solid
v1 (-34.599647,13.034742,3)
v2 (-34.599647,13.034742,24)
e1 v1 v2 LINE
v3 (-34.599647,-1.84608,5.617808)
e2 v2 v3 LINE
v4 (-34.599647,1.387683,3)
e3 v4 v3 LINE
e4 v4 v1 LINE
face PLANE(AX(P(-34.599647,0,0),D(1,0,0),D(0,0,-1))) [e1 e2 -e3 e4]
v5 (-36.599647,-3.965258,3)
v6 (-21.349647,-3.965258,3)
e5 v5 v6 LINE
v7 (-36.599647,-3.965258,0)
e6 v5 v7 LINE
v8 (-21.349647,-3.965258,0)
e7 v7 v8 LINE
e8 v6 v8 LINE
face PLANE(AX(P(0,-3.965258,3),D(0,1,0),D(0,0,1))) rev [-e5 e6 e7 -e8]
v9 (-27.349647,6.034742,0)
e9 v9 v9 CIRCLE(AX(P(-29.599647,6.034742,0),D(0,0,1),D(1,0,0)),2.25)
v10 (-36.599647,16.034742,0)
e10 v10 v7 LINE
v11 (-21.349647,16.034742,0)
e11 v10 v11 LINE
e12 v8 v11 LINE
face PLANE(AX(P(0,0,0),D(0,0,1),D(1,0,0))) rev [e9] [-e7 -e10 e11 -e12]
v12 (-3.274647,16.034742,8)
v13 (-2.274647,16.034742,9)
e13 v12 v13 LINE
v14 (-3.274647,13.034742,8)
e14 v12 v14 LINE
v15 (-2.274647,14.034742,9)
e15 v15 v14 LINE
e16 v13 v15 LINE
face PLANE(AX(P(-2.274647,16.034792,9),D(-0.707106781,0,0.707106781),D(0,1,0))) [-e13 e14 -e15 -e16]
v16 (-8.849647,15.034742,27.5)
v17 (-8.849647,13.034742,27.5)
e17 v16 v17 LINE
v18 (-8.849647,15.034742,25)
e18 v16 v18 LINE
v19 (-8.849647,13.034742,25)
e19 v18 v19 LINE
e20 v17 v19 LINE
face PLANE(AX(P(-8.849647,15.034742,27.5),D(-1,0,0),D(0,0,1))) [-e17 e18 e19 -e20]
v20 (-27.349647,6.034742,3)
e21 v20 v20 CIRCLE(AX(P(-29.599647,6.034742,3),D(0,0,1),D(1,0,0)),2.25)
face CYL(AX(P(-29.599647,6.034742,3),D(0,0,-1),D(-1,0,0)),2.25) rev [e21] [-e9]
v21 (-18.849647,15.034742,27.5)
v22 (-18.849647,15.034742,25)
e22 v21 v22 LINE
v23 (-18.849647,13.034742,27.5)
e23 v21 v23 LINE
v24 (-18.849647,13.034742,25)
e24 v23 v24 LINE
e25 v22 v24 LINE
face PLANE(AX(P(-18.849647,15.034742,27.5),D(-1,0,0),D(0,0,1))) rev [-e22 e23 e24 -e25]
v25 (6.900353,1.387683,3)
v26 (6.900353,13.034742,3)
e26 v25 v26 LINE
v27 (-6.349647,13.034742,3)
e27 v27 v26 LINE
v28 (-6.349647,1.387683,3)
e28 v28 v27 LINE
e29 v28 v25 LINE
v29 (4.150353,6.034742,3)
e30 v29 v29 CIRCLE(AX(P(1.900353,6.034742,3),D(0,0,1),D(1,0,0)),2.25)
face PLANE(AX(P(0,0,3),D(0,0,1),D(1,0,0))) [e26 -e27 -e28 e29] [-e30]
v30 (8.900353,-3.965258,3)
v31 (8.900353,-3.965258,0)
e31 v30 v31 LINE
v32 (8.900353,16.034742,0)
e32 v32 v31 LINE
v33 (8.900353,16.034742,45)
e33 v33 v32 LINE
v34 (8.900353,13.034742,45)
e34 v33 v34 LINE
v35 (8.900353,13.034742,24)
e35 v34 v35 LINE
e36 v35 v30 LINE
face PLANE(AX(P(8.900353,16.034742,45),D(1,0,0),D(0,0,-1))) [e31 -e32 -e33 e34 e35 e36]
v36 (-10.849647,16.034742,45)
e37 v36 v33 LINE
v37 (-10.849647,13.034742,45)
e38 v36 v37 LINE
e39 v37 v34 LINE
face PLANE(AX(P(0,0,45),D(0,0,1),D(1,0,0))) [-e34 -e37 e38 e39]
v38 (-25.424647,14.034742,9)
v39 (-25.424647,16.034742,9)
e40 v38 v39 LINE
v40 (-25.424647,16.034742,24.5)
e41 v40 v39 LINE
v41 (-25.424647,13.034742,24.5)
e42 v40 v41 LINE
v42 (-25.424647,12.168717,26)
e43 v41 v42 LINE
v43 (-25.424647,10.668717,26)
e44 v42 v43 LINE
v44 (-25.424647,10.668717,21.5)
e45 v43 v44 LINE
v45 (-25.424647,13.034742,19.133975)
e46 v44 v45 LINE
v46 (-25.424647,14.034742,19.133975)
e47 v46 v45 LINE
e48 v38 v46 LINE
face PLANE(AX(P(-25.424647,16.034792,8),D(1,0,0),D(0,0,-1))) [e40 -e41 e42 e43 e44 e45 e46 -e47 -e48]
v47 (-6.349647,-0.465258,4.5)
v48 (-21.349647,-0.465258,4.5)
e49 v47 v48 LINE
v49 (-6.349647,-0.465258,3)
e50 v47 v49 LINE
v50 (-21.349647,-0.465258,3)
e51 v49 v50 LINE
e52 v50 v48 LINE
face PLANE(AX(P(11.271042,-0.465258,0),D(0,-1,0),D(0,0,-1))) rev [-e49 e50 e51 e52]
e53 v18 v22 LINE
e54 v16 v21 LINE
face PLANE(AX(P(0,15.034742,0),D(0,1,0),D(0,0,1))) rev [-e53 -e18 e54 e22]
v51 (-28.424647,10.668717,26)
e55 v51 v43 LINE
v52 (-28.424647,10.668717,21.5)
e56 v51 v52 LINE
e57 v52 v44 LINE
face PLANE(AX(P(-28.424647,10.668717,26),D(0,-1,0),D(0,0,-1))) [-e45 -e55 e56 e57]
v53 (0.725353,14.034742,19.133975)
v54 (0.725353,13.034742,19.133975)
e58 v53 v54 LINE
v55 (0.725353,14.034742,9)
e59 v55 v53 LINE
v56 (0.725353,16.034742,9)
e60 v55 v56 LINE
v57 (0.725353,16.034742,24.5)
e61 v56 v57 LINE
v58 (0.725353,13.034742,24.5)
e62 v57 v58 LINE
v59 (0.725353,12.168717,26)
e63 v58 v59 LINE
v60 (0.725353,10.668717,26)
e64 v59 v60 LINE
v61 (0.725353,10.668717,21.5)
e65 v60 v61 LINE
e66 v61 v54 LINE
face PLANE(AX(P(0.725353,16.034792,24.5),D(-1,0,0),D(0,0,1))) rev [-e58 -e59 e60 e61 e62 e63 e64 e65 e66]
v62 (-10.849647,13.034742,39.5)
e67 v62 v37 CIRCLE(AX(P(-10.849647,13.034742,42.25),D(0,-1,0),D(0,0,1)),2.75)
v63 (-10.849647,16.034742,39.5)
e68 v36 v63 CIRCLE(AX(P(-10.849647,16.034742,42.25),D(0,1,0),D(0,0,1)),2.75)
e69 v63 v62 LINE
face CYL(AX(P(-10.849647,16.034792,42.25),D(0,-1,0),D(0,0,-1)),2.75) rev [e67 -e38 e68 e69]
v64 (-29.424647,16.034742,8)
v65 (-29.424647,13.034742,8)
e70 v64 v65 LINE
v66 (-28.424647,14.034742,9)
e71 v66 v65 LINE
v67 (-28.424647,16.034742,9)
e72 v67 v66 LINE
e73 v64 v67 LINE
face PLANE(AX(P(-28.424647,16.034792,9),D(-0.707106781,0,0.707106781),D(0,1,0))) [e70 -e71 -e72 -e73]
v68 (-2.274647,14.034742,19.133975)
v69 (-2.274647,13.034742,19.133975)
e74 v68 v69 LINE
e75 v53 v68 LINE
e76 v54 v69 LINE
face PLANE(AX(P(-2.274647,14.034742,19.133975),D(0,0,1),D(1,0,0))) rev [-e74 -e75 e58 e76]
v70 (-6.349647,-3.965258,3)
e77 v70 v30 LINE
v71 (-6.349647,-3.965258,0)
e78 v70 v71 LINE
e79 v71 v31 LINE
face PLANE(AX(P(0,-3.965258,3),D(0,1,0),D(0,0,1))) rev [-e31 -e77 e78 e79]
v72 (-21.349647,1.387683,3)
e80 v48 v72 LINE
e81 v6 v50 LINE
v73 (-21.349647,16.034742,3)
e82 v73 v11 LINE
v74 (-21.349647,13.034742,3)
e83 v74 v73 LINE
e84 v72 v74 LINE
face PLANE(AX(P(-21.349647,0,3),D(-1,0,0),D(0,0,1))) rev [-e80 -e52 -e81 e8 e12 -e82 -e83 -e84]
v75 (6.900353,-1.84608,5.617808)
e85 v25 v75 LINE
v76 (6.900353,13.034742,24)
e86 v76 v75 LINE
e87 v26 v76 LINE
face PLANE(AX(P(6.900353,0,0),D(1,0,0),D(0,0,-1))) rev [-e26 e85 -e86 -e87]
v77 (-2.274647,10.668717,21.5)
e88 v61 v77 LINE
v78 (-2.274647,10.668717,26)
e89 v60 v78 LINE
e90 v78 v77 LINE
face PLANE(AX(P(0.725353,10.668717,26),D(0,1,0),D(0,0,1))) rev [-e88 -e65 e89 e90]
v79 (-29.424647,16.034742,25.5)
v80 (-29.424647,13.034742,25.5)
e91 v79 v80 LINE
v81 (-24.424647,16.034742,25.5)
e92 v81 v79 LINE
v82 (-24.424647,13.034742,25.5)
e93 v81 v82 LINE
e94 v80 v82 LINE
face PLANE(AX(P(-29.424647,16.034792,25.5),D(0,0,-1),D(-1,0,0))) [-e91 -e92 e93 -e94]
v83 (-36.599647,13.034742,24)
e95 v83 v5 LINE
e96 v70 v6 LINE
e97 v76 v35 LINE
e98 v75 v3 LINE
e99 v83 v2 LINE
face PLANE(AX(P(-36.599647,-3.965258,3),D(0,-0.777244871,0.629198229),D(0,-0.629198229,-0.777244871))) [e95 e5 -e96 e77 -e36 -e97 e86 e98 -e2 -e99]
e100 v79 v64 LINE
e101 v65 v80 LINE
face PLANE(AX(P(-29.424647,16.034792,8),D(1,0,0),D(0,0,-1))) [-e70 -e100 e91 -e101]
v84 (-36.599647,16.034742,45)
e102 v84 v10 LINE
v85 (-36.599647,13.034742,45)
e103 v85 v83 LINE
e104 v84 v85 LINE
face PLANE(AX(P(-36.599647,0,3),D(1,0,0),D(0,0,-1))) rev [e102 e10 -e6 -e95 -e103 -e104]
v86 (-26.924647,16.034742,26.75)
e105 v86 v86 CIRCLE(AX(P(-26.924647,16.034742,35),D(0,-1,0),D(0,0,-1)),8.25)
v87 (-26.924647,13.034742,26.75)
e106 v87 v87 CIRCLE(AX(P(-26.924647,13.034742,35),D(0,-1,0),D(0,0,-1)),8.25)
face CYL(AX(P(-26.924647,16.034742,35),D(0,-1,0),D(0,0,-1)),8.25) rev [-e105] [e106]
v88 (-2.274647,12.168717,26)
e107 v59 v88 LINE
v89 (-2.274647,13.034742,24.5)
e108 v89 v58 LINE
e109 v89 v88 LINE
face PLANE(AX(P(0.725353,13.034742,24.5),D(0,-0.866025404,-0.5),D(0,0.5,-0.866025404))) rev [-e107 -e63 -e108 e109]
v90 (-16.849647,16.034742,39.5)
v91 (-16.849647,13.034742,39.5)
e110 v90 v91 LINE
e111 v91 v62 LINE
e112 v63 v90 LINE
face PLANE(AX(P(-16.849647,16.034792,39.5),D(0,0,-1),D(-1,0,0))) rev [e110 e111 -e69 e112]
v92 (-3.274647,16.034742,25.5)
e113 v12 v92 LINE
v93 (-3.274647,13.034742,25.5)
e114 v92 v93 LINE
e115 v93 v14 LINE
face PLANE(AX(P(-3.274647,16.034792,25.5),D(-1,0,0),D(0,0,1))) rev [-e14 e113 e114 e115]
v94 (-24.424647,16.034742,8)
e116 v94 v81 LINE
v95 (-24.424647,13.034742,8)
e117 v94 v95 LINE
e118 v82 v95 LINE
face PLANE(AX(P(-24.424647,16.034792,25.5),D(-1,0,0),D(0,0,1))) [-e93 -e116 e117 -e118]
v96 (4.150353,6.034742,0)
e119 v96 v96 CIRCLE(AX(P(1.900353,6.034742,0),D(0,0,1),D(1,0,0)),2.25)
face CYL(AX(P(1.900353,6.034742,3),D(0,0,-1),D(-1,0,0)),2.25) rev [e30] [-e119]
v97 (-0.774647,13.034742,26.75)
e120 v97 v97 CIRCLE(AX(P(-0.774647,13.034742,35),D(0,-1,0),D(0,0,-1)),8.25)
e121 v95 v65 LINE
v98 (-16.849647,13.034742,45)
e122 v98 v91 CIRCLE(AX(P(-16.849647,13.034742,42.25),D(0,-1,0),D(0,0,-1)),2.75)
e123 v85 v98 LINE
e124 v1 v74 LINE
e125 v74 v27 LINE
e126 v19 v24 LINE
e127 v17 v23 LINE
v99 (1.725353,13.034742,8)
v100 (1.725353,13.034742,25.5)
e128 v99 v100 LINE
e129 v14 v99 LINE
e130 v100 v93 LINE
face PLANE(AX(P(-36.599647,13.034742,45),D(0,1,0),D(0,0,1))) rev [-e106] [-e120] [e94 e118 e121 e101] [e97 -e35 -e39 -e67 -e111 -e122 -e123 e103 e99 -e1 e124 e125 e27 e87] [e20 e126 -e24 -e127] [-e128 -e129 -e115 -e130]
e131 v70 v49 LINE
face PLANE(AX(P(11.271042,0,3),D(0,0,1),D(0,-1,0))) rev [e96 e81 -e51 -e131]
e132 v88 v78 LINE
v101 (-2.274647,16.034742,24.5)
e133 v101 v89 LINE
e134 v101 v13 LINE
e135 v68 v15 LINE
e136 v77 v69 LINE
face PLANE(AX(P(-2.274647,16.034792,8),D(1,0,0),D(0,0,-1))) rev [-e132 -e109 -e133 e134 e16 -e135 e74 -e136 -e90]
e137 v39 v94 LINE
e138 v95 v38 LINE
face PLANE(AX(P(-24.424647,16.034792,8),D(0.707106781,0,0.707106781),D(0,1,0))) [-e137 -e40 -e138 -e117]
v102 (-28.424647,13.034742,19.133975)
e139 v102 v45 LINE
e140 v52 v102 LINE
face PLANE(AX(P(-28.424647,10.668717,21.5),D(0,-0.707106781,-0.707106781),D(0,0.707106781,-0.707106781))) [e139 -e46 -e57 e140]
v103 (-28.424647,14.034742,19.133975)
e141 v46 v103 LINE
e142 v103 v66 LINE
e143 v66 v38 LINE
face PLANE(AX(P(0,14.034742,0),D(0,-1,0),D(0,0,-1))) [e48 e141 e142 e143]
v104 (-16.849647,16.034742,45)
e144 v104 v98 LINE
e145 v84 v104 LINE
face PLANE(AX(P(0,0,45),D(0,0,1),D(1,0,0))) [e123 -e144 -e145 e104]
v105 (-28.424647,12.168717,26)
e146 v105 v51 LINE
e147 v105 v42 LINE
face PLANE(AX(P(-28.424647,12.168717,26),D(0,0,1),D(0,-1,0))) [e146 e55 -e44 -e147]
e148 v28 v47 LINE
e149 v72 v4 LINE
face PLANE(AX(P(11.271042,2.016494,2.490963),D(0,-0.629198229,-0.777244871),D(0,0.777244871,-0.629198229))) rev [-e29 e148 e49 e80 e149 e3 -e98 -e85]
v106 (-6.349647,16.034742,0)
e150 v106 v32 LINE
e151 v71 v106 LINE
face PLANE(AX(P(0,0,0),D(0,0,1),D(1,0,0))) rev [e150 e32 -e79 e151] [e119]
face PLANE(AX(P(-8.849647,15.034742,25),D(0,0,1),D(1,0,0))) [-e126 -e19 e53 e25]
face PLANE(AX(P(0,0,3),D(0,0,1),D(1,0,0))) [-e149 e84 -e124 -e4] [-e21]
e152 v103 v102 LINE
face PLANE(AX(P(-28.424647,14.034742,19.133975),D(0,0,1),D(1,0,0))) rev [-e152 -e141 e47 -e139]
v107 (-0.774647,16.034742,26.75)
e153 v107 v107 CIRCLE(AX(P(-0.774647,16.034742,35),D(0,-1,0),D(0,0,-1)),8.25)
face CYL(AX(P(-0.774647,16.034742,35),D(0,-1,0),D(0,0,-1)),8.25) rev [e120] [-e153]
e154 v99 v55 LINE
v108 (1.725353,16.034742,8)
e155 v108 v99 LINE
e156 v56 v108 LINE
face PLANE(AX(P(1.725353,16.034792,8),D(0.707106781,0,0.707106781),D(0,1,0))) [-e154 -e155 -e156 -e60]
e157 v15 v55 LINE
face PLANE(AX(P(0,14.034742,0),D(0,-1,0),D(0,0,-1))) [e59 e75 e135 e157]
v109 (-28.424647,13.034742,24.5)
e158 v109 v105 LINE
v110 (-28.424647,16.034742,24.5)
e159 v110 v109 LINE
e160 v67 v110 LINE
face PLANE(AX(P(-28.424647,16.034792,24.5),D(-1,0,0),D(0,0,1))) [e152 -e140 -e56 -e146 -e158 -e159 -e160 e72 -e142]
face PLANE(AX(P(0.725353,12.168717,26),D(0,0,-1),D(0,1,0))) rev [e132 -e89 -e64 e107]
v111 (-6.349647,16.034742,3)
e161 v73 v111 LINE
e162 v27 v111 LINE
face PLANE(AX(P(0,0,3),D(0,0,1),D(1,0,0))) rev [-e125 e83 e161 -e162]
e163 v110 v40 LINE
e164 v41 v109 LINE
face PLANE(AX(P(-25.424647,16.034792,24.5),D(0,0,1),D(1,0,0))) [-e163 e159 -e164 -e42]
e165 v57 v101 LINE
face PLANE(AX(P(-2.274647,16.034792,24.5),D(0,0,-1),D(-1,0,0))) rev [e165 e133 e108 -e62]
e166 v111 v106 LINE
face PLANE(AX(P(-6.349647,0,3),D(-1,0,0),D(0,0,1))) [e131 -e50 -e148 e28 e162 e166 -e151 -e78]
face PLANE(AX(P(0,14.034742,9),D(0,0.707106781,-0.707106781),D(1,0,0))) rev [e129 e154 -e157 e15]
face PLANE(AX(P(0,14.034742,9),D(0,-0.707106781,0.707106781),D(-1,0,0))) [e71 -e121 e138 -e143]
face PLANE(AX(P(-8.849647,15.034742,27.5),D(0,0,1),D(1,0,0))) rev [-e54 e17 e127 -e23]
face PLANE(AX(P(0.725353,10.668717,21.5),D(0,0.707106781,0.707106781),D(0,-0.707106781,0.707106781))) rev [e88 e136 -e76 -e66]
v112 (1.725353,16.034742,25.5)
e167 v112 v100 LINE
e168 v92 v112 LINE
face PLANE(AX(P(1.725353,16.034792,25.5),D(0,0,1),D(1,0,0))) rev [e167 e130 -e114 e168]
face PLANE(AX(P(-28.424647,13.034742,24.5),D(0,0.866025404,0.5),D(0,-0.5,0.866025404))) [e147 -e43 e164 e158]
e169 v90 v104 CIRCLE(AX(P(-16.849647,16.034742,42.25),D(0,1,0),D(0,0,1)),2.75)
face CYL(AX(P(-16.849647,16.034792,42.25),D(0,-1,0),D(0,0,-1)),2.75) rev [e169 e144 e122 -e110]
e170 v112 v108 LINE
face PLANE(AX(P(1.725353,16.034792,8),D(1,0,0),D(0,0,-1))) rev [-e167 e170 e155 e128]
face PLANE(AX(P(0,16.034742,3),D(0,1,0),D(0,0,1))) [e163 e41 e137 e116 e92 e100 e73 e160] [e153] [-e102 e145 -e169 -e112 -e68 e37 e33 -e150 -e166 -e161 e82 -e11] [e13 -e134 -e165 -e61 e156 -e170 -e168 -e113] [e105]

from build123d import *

# Parameters (mm, degrees)
SKETCH1_W             = 15.25
SKETCH1_H             = 20
SKETCH1_R             = 2.25
BOSS_EXTRUDE1_DEPTH   = 3
BOSS_EXTRUDE1_2_DEPTH = 3
SKETCH2_W             = 45.5
SKETCH2_H             = 3
BOSS_EXTRUDE2_DEPTH   = 42
SKETCH3_R             = 8.25
CUT_EXTRUDE1_DEPTH    = 61.44447165
BOSS_EXTRUDE3_DEPTH   = 2
LPATTERN1_COUNT       = 2
LPATTERN1_PITCH       = 43.5
CUT_EXTRUDE2_DEPTH    = 61.44447165
BOSS_EXTRUDE4_DEPTH   = 3
CUT_EXTRUDE3_DEPTH    = 61.44447165
SKETCH10_W            = 10
SKETCH10_H            = 2.5
CUT_EXTRUDE4_DEPTH    = 2
BOSS_EXTRUDE5_REACH   = 66.609
SKETCH13_W            = 3
SKETCH13_H            = 11.133974596
CUT_EXTRUDE6_DEPTH    = 1
CHAMFER1_SIZE         = 1
BOSS_EXTRUDE6_DEPTH   = 13.25
CHAMFER2_SIZE         = 1


with BuildPart() as part:
    # Sketch1 → Boss-Extrude1 (new body)
    with BuildSketch(Plane.XY):
        with Locations((-28.974646897, 6.034741944)):
            Rectangle(SKETCH1_W, SKETCH1_H)
        with Locations((-29.599646897, 6.034741944)):
            Circle(SKETCH1_R, mode=Mode.SUBTRACT)
    extrude(amount=BOSS_EXTRUDE1_DEPTH)


with BuildPart() as body_2:
    # Sketch1 → Boss-Extrude1 2 (new body)
    with BuildSketch(Plane.XY):
        with Locations((1.275353103, 6.034741944)):
            Rectangle(SKETCH1_W, SKETCH1_H)
        with Locations((1.900353103, 6.034741944)):
            Circle(SKETCH1_R, mode=Mode.SUBTRACT)
    extrude(amount=BOSS_EXTRUDE1_2_DEPTH)



with BuildPart() as body_3:
    # Sketch2 → Boss-Extrude2 (new body)
    with BuildSketch(Plane.XY.offset(3)):
        with Locations((-13.849646897, 14.534741944)):
            Rectangle(SKETCH2_W, SKETCH2_H)
    extrude(amount=BOSS_EXTRUDE2_DEPTH)

    # Sketch3 → Cut-Extrude1 (cut, through all)
    with BuildSketch(Plane(origin=(0, 13.034741944, 0), x_dir=(-1, 0, 0), z_dir=(0, -1, 0))):
        with Locations(Location((26.924646897, -35, 0), (0, 0, 90))):
            Circle(SKETCH3_R)
        with Locations(Location((0.774646897, -35, 0), (0, 0, 90))):
            Circle(SKETCH3_R)
    extrude(amount=-CUT_EXTRUDE1_DEPTH, mode=Mode.SUBTRACT)


with BuildPart() as body_2_1:
    add(body_2.part)

    add(body_3.part)  # Boss-Extrude3 merges body 3
    # Sketch4 → Boss-Extrude3 (add)
    with BuildSketch(Plane(origin=(8.900353103, 0, 0), x_dir=(0, 0, -1), z_dir=(1, 0, 0))):
        Polygon((-3, -3.965258056), (-24, 13.034741944), (-3, 13.034741944), align=None)
    boss_extrude3 = extrude(amount=-BOSS_EXTRUDE3_DEPTH)


with BuildPart() as part_1:
    add(part.part)

    add(body_2_1.part)  # LPattern1 merges body 2
    # LPattern1: Boss-Extrude3 ×2
    with Locations(*[(-i * LPATTERN1_PITCH, 0, 0) for i in range(1, LPATTERN1_COUNT)]):
        add(boss_extrude3)

    # Sketch5 → Cut-Extrude2 (cut, through all)
    with BuildSketch(Plane(origin=(0, 13.034741944, 0), x_dir=(-1, 0, 0), z_dir=(0, -1, 0))):
        Polygon((29.424646897, -8), (29.424646897, -25.5), (24.424646897, -25.5), (24.424646897, -8), (25.424646897, -8), (25.424646897, -24.5), (28.424646897, -24.5), (28.424646897, -8), align=None)
        Polygon((-0.725353103, -8), (-1.725353103, -8), (-1.725353103, -25.5), (3.274646897, -25.5), (3.274646897, -8), (2.274646897, -8), (2.274646897, -24.5), (-0.725353103, -24.5), align=None)
    extrude(amount=-CUT_EXTRUDE2_DEPTH, mode=Mode.SUBTRACT)

    # Sketch6 → Boss-Extrude4 (add)
    with BuildSketch(Plane(origin=(-25.424646897, 0, 0), x_dir=(0, 0, -1), z_dir=(1, 0, 0))):
        Polygon((-24.5, 13.034741944), (-26, 12.16871654), (-26, 10.66871654), (-21.5, 10.66871654), (-19.133974596, 13.034741944), align=None)
    boss_extrude4 = extrude(amount=-BOSS_EXTRUDE4_DEPTH)

    # Mirror7: Boss-Extrude4 across plane
    add(boss_extrude4.mirror(Plane(origin=(-13.849646897, 13.034741944, 8), x_dir=(0, 0, 1), z_dir=(1, 0, 0))))

    # Sketch9 → Cut-Extrude3 (cut, through all)
    with BuildSketch(Plane(origin=(0, 13.034741944, 0), x_dir=(-1, 0, 0), z_dir=(0, -1, 0))):
        with BuildLine():
            Line((16.849646897, -45), (10.849646897, -45))
            ThreePointArc((10.849646897, -45), (8.099646897, -42.25), (10.849646897, -39.5))
            Line((10.849646897, -39.5), (16.849646897, -39.5))
            ThreePointArc((16.849646897, -39.5), (19.599646897, -42.25), (16.849646897, -45))
        make_face()
    extrude(amount=-CUT_EXTRUDE3_DEPTH, mode=Mode.SUBTRACT)

    # Sketch10 → Cut-Extrude4 (cut)
    with BuildSketch(Plane(origin=(0, 13.034741944, 0), x_dir=(-1, 0, 0), z_dir=(0, -1, 0))):
        with Locations((13.849646897, -26.25)):
            Rectangle(SKETCH10_W, SKETCH10_H)
    extrude(amount=-CUT_EXTRUDE4_DEPTH, mode=Mode.SUBTRACT)

    # Boss-Extrude5: up to this face of the body (flat: up to its plane)
    boss_extrude5_end = Plane(part_1.part.faces().sort_by_distance((6.900353103, 7.368075277, 10))[0])
    # Sketch11 → Boss-Extrude5 (add, up to the picked face)
    with BuildSketch(Plane(origin=(-34.599646897, 0, 0), x_dir=(0, 0, -1), z_dir=(1, 0, 0)), mode=Mode.PRIVATE) as boss_extrude5_sk1:
        Polygon((-5.617808219, -1.846079974), (-3, -3.965258056), (-3, -0.465258056), (-4.5, -0.465258056), align=None)
    boss_extrude5_tool1 = split(extrude(boss_extrude5_sk1.sketch, amount=BOSS_EXTRUDE5_REACH, mode=Mode.PRIVATE), bisect_by=boss_extrude5_end, keep=Keep.BOTH, mode=Mode.PRIVATE)
    add(boss_extrude5_tool1.solids().sort_by(Axis((-34.599647, -1.87709, 3.964792), (1, 0, 0)))[0])

    # Sketch13 → Cut-Extrude6 (cut)
    with BuildSketch(Plane(origin=(0, 13.034741944, 0), x_dir=(-1, 0, 0), z_dir=(0, -1, 0))):
        with Locations((26.924646897, -13.566987298)):
            Rectangle(SKETCH13_W, SKETCH13_H)
        with Locations((0.774646897, -13.566987298)):
            Rectangle(SKETCH13_W, SKETCH13_H)
    extrude(amount=-CUT_EXTRUDE6_DEPTH, mode=Mode.SUBTRACT)

    # Chamfer1
    chamfer1_edges = [part_1.edges().sort_by_distance(p)[0] for p in [
        (-26.924646897, 14.034741944, 8),
        (-0.774646897, 14.034741944, 8),
    ]]
    chamfer(chamfer1_edges, length=CHAMFER1_SIZE - 0.0001)  # a hair under: the kernel refuses the full size

    # Sketch11<3> → Boss-Extrude6 (add)
    with BuildSketch(Plane(origin=(-34.599646897, 0, 0), x_dir=(0, 0, -1), z_dir=(1, 0, 0))):
        Polygon((-4.5, -0.465258056), (-3, -0.465258056), (-3, 1.38768312), align=None)
    boss_extrude6 = extrude(amount=BOSS_EXTRUDE6_DEPTH)

    # Mirror8: Boss-Extrude6 across plane
    add(boss_extrude6.mirror(Plane(origin=(-13.849646897, 13.034741944, 8), x_dir=(0, 0, 1), z_dir=(1, 0, 0))))

    # Chamfer2
    chamfer2_edges = [part_1.edges().sort_by_distance(p)[0] for p in [
        (-28.424646897, 14.534791944, 8),
        (-2.274646897, 14.534791944, 8),
        (-25.424646897, 14.534791944, 8),
        (0.725353103, 14.534791944, 8),
    ]]
    chamfer(chamfer2_edges, length=CHAMFER2_SIZE - 0.0001)  # a hair under: the kernel refuses the full size


solid = part_1.part
